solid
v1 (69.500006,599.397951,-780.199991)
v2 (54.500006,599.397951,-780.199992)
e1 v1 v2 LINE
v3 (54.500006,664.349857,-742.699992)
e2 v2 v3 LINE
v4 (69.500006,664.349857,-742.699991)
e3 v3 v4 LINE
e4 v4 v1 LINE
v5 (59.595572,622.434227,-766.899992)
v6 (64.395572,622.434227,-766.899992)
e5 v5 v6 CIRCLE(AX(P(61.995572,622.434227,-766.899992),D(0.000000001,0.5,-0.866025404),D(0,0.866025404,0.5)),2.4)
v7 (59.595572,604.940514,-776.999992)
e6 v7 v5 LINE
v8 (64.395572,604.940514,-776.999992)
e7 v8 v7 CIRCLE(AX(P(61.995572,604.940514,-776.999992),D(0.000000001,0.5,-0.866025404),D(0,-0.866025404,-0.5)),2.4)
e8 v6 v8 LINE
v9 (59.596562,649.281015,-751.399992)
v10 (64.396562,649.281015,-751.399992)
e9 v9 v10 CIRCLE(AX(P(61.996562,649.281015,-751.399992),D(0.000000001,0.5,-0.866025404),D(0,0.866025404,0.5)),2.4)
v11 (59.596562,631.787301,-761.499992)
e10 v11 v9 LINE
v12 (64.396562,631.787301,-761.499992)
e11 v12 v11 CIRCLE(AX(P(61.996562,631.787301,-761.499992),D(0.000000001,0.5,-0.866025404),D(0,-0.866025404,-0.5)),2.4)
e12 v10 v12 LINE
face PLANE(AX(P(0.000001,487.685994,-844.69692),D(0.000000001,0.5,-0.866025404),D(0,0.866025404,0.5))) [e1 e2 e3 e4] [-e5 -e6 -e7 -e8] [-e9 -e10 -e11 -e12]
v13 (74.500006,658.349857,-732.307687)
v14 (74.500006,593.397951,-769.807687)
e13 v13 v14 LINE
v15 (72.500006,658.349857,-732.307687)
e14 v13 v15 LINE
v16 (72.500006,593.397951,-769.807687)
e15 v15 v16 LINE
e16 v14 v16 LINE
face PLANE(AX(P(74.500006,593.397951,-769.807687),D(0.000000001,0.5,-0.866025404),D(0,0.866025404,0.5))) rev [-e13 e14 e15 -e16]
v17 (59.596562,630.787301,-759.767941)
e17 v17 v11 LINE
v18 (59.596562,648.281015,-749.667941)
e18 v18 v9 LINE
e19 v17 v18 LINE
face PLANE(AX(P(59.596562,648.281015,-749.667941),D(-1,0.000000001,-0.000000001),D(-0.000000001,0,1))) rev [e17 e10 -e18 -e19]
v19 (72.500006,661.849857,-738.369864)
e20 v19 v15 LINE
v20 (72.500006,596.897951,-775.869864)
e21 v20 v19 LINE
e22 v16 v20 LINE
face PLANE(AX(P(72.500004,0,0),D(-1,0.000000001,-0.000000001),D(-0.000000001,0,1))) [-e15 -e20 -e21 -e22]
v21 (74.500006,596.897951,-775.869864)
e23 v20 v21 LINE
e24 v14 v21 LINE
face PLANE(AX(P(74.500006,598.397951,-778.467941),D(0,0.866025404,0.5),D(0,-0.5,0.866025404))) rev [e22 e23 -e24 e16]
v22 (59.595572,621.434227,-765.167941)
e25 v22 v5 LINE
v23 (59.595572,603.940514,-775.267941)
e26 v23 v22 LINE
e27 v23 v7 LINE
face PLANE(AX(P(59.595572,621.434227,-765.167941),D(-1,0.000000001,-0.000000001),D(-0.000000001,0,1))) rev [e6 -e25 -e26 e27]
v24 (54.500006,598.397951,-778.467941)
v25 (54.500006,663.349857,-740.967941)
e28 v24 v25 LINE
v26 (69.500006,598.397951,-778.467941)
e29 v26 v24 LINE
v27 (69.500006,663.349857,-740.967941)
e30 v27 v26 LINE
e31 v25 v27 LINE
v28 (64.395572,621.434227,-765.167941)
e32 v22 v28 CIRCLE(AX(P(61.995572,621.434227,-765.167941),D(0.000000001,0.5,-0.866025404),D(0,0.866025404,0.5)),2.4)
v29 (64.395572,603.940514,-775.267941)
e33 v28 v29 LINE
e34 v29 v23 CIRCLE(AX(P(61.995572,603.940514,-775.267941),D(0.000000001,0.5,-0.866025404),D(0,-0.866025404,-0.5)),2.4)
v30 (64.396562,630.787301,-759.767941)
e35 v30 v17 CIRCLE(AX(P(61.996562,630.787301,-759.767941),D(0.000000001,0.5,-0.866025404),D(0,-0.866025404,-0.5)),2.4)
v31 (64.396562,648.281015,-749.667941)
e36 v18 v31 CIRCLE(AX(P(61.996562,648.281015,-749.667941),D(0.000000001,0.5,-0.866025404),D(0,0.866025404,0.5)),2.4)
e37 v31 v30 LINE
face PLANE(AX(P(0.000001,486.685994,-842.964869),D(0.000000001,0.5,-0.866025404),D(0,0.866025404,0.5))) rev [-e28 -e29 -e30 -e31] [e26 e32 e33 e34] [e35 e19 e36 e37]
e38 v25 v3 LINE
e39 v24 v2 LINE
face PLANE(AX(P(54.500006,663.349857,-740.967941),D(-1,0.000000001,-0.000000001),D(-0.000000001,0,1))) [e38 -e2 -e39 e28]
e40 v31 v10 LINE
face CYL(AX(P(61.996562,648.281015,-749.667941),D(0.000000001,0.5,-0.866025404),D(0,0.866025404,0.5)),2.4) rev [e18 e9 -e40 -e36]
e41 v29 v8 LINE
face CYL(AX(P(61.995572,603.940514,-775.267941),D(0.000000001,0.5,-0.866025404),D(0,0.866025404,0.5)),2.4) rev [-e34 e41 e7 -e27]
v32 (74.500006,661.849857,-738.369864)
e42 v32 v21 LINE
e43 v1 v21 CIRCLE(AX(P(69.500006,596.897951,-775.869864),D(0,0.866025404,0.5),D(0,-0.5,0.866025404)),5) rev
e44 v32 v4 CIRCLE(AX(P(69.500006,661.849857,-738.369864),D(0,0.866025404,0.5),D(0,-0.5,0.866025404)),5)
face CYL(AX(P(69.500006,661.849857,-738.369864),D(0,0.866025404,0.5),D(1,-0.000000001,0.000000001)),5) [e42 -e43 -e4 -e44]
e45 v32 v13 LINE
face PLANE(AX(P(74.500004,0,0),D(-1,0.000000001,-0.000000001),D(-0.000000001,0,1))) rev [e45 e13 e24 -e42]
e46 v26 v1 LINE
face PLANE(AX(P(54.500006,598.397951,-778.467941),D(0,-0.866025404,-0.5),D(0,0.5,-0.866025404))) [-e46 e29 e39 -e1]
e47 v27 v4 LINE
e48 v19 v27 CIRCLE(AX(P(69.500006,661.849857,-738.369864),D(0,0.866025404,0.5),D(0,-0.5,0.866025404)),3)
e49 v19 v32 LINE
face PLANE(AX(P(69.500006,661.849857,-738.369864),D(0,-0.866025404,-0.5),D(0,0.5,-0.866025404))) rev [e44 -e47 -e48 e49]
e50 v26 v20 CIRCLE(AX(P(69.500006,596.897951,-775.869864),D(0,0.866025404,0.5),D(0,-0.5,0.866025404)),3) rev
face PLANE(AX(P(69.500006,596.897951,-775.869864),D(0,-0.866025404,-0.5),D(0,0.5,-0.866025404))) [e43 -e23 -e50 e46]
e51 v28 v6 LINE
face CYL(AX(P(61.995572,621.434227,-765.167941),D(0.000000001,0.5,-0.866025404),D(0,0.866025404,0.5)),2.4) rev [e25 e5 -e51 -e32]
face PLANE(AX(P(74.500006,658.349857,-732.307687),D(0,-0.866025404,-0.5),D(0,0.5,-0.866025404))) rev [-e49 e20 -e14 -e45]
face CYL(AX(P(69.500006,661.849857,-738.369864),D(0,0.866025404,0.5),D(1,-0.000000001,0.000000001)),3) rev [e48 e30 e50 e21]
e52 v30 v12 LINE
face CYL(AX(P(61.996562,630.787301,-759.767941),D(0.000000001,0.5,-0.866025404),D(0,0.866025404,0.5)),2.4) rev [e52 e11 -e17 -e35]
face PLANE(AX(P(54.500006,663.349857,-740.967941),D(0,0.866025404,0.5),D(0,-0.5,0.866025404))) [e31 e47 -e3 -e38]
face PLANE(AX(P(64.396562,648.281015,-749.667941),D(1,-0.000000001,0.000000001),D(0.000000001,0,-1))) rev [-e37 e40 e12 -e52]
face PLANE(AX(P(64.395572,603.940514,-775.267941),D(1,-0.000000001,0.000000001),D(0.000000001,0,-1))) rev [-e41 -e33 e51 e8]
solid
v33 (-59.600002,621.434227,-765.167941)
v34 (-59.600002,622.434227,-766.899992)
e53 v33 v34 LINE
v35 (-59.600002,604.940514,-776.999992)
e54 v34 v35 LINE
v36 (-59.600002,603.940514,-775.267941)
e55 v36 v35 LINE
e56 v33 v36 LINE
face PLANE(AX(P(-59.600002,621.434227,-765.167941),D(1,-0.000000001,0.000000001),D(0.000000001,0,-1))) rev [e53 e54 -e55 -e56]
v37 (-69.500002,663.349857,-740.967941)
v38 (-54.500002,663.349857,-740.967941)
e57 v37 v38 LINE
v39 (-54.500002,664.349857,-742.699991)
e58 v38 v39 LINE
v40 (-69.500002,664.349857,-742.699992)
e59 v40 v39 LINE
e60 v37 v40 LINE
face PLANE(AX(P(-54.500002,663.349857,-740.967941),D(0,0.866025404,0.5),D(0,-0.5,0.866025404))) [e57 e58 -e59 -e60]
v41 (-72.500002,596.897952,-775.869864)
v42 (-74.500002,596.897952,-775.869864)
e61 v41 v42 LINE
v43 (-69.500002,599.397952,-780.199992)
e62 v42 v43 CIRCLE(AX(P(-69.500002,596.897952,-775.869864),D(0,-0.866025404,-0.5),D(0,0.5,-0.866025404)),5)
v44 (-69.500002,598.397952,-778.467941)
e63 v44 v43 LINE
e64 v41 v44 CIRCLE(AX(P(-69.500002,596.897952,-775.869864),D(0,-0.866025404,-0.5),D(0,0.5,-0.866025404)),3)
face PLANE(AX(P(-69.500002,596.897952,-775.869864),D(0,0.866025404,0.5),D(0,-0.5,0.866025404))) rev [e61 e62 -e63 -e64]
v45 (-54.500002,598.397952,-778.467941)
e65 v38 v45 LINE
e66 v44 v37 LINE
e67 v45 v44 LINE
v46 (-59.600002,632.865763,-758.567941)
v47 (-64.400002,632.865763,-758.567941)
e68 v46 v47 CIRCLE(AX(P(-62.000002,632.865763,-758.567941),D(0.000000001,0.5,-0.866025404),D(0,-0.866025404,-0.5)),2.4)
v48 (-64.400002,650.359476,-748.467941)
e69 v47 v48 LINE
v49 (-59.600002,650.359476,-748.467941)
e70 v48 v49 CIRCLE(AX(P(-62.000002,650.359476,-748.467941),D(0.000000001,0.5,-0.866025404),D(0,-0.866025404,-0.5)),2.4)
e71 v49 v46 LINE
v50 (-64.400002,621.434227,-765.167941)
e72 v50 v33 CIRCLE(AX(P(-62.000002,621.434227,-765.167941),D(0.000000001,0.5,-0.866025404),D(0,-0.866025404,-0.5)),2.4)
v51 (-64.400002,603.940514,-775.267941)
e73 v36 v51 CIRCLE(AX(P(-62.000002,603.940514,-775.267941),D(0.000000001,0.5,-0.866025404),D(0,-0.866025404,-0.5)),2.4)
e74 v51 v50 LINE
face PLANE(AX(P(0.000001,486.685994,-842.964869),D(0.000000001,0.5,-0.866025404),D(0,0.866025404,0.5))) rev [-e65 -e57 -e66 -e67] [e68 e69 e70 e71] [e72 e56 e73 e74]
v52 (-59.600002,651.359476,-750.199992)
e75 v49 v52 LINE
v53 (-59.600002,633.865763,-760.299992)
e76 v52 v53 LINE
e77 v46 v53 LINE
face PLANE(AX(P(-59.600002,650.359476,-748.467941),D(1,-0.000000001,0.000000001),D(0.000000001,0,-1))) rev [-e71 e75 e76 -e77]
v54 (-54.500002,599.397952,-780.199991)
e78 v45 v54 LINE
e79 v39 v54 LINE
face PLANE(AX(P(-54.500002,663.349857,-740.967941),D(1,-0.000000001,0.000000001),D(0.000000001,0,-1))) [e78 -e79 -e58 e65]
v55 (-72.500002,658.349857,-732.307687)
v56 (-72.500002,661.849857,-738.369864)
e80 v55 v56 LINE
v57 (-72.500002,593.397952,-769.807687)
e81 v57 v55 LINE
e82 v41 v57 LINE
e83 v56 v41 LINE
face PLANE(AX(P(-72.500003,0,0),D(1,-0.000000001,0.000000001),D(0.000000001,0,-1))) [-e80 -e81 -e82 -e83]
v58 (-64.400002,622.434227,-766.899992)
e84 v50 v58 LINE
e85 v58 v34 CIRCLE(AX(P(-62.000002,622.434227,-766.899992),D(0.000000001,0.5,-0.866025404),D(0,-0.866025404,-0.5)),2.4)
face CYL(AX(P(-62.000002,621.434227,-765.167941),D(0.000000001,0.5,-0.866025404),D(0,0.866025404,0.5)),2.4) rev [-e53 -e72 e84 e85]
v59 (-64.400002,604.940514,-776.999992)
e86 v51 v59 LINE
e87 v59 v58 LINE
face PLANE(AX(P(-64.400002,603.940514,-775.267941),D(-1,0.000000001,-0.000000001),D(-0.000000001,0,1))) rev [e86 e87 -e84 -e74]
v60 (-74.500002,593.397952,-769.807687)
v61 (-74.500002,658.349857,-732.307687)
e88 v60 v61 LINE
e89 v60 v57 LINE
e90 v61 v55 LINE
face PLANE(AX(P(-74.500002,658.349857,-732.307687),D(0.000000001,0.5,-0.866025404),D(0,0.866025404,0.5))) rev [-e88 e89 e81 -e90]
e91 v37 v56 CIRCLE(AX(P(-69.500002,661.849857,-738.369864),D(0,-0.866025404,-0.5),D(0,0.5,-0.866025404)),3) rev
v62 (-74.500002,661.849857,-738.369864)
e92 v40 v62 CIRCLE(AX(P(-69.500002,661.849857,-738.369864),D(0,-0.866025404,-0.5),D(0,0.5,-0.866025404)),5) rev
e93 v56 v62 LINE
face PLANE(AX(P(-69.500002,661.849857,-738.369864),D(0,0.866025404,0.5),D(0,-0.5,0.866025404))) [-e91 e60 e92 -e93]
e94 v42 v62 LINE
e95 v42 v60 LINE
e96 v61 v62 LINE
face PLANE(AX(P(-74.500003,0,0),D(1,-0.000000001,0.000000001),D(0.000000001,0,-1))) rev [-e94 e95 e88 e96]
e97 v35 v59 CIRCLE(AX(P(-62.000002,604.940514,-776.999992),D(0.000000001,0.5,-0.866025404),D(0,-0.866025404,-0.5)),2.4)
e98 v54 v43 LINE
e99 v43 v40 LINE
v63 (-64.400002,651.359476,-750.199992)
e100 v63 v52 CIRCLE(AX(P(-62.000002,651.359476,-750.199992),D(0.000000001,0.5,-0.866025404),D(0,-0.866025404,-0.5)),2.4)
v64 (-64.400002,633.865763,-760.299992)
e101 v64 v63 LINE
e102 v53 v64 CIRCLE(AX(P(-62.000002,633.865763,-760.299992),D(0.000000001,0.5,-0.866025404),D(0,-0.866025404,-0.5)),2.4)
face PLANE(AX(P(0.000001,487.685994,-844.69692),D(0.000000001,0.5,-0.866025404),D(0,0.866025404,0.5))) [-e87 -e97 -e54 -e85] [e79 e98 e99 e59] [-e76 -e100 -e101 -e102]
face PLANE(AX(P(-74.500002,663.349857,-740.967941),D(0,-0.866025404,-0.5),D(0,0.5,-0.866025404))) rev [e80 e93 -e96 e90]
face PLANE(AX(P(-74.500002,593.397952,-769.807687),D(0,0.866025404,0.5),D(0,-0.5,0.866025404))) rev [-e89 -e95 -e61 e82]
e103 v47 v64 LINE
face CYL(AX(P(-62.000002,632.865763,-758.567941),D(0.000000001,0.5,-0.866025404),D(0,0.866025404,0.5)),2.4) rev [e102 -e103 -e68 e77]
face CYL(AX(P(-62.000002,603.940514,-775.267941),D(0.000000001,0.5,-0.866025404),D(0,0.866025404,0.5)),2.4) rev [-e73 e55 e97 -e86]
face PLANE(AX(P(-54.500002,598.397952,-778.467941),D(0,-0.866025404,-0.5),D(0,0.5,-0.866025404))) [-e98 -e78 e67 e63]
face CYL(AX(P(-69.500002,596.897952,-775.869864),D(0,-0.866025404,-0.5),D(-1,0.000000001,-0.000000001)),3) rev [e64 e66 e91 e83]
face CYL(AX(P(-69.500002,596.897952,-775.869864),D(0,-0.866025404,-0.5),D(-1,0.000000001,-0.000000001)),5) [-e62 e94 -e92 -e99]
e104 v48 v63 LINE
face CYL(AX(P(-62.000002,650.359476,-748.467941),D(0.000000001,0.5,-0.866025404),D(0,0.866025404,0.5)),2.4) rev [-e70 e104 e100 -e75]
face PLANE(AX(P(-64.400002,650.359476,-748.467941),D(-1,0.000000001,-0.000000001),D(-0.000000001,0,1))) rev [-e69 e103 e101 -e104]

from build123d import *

# Parameters (mm, degrees)
SKETCH2_W              = 15
SKETCH2_H              = 75
BASE_FLANGE2_DEPTH     = 2
SM_EDGE_FLANGE_2_DEPTH = 75
SKETCH12_W             = 15
SKETCH12_H             = 75
BASE_FLANGE3_DEPTH     = 2
SM_EDGE_FLANGE_3_DEPTH = 75


# Sheet-metal steps are written as plain solids
with BuildPart() as part:
    # Sketch2 → Base-Flange2 (new body)
    with BuildSketch(Plane(origin=(1.391e-06, 487.685994213, -844.696920117), x_dir=(-1.0, 7.129193608778373e-10, -1.2348125547399519e-09), z_dir=(1.4258387217556799e-09, 0.4999999999999983, -0.8660254037844398))):
        with Locations((-62.000004193, 166.493857073)):
            Rectangle(SKETCH2_W, SKETCH2_H)
        with BuildLine():
            Line((-59.596560145, 186.593857073), (-59.596560145, 166.393857073))
            ThreePointArc((-59.596560145, 166.393857073), (-61.996560145, 163.993857073), (-64.396560145, 166.393857073))
            Line((-64.396560145, 166.393857073), (-64.396560145, 186.593857073))
            ThreePointArc((-64.396560145, 186.593857073), (-61.996560145, 188.993857073), (-59.596560145, 186.593857073))
        make_face(mode=Mode.SUBTRACT)
        with BuildLine():
            Line((-59.595570898, 155.593857073), (-59.595570898, 135.393857073))
            ThreePointArc((-59.595570898, 135.393857073), (-61.995570898, 132.993857073), (-64.395570898, 135.393857073))
            Line((-64.395570898, 135.393857073), (-64.395570898, 155.593857073))
            ThreePointArc((-64.395570898, 155.593857073), (-61.995570898, 157.993857073), (-59.595570898, 155.593857073))
        make_face(mode=Mode.SUBTRACT)
    extrude(amount=-BASE_FLANGE2_DEPTH)

    # 邊線-凸緣2 section (across the edge) → 邊線-凸緣2 (add)
    with BuildSketch(Plane(origin=(72.50000558, 598.397951319, -778.467940683), x_dir=(-1.0, 7.129173158057236e-10, -1.2348090125711463e-09), z_dir=(0, 0.8660254037844398, 0.49999999999999817))):
        with BuildLine():
            Line((-2, 3), (-2, 10))
            Line((-2, 10), (0, 10))
            Line((0, 10), (0, 3))
            ThreePointArc((0, 3), (0.878679656, 0.878679656), (3, 0))
            Line((3, 0), (3, -2))
            ThreePointArc((3, -2), (-0.535533906, -0.535533906), (-2, 3))
        make_face()
    extrude(amount=SM_EDGE_FLANGE_2_DEPTH)


with BuildPart() as body_2:
    # Sketch12 → Base-Flange3 (new body)
    with BuildSketch(Plane(origin=(1.391e-06, 487.685994213, -844.696920117), x_dir=(-1.0, 7.129193608778373e-10, -1.2348125547399519e-09), z_dir=(1.4258387217556799e-09, 0.4999999999999983, -0.8660254037844398))):
        with Locations((62.000003094, 166.493857379)):
            Rectangle(SKETCH12_W, SKETCH12_H)
        with BuildLine():
            Line((59.600003094, 155.593857379), (59.600003094, 135.393857379))
            ThreePointArc((59.600003094, 135.393857379), (62.000003094, 132.993857379), (64.400003094, 135.393857379))
            Line((64.400003094, 135.393857379), (64.400003094, 155.593857379))
            ThreePointArc((64.400003094, 155.593857379), (62.000003094, 157.993857379), (59.600003094, 155.593857379))
        make_face(mode=Mode.SUBTRACT)
        with BuildLine():
            Line((59.600003094, 188.993857379), (59.600003094, 168.793857379))
            ThreePointArc((59.600003094, 168.793857379), (62.000003094, 166.393857379), (64.400003094, 168.793857379))
            Line((64.400003094, 168.793857379), (64.400003094, 188.993857379))
            ThreePointArc((64.400003094, 188.993857379), (62.000003094, 191.393857379), (59.600003094, 188.993857379))
        make_face(mode=Mode.SUBTRACT)
    extrude(amount=-BASE_FLANGE3_DEPTH)

    # 邊線-凸緣3 section (across the edge) → 邊線-凸緣3 (add)
    with BuildSketch(Plane(origin=(-72.500001706, 663.349856971, -740.967940709), x_dir=(1.0, -7.1292094177144e-10, 1.2348149228536517e-09), z_dir=(0, -0.8660254037844398, -0.49999999999999817))):
        with BuildLine():
            Line((-2, 3), (-2, 10))
            Line((-2, 10), (0, 10))
            Line((0, 10), (0, 3))
            ThreePointArc((0, 3), (0.878679656, 0.878679656), (3, 0))
            Line((3, 0), (3, -2))
            ThreePointArc((3, -2), (-0.535533906, -0.535533906), (-2, 3))
        make_face()
    extrude(amount=SM_EDGE_FLANGE_3_DEPTH)


solid = Compound([part.part, body_2.part])
